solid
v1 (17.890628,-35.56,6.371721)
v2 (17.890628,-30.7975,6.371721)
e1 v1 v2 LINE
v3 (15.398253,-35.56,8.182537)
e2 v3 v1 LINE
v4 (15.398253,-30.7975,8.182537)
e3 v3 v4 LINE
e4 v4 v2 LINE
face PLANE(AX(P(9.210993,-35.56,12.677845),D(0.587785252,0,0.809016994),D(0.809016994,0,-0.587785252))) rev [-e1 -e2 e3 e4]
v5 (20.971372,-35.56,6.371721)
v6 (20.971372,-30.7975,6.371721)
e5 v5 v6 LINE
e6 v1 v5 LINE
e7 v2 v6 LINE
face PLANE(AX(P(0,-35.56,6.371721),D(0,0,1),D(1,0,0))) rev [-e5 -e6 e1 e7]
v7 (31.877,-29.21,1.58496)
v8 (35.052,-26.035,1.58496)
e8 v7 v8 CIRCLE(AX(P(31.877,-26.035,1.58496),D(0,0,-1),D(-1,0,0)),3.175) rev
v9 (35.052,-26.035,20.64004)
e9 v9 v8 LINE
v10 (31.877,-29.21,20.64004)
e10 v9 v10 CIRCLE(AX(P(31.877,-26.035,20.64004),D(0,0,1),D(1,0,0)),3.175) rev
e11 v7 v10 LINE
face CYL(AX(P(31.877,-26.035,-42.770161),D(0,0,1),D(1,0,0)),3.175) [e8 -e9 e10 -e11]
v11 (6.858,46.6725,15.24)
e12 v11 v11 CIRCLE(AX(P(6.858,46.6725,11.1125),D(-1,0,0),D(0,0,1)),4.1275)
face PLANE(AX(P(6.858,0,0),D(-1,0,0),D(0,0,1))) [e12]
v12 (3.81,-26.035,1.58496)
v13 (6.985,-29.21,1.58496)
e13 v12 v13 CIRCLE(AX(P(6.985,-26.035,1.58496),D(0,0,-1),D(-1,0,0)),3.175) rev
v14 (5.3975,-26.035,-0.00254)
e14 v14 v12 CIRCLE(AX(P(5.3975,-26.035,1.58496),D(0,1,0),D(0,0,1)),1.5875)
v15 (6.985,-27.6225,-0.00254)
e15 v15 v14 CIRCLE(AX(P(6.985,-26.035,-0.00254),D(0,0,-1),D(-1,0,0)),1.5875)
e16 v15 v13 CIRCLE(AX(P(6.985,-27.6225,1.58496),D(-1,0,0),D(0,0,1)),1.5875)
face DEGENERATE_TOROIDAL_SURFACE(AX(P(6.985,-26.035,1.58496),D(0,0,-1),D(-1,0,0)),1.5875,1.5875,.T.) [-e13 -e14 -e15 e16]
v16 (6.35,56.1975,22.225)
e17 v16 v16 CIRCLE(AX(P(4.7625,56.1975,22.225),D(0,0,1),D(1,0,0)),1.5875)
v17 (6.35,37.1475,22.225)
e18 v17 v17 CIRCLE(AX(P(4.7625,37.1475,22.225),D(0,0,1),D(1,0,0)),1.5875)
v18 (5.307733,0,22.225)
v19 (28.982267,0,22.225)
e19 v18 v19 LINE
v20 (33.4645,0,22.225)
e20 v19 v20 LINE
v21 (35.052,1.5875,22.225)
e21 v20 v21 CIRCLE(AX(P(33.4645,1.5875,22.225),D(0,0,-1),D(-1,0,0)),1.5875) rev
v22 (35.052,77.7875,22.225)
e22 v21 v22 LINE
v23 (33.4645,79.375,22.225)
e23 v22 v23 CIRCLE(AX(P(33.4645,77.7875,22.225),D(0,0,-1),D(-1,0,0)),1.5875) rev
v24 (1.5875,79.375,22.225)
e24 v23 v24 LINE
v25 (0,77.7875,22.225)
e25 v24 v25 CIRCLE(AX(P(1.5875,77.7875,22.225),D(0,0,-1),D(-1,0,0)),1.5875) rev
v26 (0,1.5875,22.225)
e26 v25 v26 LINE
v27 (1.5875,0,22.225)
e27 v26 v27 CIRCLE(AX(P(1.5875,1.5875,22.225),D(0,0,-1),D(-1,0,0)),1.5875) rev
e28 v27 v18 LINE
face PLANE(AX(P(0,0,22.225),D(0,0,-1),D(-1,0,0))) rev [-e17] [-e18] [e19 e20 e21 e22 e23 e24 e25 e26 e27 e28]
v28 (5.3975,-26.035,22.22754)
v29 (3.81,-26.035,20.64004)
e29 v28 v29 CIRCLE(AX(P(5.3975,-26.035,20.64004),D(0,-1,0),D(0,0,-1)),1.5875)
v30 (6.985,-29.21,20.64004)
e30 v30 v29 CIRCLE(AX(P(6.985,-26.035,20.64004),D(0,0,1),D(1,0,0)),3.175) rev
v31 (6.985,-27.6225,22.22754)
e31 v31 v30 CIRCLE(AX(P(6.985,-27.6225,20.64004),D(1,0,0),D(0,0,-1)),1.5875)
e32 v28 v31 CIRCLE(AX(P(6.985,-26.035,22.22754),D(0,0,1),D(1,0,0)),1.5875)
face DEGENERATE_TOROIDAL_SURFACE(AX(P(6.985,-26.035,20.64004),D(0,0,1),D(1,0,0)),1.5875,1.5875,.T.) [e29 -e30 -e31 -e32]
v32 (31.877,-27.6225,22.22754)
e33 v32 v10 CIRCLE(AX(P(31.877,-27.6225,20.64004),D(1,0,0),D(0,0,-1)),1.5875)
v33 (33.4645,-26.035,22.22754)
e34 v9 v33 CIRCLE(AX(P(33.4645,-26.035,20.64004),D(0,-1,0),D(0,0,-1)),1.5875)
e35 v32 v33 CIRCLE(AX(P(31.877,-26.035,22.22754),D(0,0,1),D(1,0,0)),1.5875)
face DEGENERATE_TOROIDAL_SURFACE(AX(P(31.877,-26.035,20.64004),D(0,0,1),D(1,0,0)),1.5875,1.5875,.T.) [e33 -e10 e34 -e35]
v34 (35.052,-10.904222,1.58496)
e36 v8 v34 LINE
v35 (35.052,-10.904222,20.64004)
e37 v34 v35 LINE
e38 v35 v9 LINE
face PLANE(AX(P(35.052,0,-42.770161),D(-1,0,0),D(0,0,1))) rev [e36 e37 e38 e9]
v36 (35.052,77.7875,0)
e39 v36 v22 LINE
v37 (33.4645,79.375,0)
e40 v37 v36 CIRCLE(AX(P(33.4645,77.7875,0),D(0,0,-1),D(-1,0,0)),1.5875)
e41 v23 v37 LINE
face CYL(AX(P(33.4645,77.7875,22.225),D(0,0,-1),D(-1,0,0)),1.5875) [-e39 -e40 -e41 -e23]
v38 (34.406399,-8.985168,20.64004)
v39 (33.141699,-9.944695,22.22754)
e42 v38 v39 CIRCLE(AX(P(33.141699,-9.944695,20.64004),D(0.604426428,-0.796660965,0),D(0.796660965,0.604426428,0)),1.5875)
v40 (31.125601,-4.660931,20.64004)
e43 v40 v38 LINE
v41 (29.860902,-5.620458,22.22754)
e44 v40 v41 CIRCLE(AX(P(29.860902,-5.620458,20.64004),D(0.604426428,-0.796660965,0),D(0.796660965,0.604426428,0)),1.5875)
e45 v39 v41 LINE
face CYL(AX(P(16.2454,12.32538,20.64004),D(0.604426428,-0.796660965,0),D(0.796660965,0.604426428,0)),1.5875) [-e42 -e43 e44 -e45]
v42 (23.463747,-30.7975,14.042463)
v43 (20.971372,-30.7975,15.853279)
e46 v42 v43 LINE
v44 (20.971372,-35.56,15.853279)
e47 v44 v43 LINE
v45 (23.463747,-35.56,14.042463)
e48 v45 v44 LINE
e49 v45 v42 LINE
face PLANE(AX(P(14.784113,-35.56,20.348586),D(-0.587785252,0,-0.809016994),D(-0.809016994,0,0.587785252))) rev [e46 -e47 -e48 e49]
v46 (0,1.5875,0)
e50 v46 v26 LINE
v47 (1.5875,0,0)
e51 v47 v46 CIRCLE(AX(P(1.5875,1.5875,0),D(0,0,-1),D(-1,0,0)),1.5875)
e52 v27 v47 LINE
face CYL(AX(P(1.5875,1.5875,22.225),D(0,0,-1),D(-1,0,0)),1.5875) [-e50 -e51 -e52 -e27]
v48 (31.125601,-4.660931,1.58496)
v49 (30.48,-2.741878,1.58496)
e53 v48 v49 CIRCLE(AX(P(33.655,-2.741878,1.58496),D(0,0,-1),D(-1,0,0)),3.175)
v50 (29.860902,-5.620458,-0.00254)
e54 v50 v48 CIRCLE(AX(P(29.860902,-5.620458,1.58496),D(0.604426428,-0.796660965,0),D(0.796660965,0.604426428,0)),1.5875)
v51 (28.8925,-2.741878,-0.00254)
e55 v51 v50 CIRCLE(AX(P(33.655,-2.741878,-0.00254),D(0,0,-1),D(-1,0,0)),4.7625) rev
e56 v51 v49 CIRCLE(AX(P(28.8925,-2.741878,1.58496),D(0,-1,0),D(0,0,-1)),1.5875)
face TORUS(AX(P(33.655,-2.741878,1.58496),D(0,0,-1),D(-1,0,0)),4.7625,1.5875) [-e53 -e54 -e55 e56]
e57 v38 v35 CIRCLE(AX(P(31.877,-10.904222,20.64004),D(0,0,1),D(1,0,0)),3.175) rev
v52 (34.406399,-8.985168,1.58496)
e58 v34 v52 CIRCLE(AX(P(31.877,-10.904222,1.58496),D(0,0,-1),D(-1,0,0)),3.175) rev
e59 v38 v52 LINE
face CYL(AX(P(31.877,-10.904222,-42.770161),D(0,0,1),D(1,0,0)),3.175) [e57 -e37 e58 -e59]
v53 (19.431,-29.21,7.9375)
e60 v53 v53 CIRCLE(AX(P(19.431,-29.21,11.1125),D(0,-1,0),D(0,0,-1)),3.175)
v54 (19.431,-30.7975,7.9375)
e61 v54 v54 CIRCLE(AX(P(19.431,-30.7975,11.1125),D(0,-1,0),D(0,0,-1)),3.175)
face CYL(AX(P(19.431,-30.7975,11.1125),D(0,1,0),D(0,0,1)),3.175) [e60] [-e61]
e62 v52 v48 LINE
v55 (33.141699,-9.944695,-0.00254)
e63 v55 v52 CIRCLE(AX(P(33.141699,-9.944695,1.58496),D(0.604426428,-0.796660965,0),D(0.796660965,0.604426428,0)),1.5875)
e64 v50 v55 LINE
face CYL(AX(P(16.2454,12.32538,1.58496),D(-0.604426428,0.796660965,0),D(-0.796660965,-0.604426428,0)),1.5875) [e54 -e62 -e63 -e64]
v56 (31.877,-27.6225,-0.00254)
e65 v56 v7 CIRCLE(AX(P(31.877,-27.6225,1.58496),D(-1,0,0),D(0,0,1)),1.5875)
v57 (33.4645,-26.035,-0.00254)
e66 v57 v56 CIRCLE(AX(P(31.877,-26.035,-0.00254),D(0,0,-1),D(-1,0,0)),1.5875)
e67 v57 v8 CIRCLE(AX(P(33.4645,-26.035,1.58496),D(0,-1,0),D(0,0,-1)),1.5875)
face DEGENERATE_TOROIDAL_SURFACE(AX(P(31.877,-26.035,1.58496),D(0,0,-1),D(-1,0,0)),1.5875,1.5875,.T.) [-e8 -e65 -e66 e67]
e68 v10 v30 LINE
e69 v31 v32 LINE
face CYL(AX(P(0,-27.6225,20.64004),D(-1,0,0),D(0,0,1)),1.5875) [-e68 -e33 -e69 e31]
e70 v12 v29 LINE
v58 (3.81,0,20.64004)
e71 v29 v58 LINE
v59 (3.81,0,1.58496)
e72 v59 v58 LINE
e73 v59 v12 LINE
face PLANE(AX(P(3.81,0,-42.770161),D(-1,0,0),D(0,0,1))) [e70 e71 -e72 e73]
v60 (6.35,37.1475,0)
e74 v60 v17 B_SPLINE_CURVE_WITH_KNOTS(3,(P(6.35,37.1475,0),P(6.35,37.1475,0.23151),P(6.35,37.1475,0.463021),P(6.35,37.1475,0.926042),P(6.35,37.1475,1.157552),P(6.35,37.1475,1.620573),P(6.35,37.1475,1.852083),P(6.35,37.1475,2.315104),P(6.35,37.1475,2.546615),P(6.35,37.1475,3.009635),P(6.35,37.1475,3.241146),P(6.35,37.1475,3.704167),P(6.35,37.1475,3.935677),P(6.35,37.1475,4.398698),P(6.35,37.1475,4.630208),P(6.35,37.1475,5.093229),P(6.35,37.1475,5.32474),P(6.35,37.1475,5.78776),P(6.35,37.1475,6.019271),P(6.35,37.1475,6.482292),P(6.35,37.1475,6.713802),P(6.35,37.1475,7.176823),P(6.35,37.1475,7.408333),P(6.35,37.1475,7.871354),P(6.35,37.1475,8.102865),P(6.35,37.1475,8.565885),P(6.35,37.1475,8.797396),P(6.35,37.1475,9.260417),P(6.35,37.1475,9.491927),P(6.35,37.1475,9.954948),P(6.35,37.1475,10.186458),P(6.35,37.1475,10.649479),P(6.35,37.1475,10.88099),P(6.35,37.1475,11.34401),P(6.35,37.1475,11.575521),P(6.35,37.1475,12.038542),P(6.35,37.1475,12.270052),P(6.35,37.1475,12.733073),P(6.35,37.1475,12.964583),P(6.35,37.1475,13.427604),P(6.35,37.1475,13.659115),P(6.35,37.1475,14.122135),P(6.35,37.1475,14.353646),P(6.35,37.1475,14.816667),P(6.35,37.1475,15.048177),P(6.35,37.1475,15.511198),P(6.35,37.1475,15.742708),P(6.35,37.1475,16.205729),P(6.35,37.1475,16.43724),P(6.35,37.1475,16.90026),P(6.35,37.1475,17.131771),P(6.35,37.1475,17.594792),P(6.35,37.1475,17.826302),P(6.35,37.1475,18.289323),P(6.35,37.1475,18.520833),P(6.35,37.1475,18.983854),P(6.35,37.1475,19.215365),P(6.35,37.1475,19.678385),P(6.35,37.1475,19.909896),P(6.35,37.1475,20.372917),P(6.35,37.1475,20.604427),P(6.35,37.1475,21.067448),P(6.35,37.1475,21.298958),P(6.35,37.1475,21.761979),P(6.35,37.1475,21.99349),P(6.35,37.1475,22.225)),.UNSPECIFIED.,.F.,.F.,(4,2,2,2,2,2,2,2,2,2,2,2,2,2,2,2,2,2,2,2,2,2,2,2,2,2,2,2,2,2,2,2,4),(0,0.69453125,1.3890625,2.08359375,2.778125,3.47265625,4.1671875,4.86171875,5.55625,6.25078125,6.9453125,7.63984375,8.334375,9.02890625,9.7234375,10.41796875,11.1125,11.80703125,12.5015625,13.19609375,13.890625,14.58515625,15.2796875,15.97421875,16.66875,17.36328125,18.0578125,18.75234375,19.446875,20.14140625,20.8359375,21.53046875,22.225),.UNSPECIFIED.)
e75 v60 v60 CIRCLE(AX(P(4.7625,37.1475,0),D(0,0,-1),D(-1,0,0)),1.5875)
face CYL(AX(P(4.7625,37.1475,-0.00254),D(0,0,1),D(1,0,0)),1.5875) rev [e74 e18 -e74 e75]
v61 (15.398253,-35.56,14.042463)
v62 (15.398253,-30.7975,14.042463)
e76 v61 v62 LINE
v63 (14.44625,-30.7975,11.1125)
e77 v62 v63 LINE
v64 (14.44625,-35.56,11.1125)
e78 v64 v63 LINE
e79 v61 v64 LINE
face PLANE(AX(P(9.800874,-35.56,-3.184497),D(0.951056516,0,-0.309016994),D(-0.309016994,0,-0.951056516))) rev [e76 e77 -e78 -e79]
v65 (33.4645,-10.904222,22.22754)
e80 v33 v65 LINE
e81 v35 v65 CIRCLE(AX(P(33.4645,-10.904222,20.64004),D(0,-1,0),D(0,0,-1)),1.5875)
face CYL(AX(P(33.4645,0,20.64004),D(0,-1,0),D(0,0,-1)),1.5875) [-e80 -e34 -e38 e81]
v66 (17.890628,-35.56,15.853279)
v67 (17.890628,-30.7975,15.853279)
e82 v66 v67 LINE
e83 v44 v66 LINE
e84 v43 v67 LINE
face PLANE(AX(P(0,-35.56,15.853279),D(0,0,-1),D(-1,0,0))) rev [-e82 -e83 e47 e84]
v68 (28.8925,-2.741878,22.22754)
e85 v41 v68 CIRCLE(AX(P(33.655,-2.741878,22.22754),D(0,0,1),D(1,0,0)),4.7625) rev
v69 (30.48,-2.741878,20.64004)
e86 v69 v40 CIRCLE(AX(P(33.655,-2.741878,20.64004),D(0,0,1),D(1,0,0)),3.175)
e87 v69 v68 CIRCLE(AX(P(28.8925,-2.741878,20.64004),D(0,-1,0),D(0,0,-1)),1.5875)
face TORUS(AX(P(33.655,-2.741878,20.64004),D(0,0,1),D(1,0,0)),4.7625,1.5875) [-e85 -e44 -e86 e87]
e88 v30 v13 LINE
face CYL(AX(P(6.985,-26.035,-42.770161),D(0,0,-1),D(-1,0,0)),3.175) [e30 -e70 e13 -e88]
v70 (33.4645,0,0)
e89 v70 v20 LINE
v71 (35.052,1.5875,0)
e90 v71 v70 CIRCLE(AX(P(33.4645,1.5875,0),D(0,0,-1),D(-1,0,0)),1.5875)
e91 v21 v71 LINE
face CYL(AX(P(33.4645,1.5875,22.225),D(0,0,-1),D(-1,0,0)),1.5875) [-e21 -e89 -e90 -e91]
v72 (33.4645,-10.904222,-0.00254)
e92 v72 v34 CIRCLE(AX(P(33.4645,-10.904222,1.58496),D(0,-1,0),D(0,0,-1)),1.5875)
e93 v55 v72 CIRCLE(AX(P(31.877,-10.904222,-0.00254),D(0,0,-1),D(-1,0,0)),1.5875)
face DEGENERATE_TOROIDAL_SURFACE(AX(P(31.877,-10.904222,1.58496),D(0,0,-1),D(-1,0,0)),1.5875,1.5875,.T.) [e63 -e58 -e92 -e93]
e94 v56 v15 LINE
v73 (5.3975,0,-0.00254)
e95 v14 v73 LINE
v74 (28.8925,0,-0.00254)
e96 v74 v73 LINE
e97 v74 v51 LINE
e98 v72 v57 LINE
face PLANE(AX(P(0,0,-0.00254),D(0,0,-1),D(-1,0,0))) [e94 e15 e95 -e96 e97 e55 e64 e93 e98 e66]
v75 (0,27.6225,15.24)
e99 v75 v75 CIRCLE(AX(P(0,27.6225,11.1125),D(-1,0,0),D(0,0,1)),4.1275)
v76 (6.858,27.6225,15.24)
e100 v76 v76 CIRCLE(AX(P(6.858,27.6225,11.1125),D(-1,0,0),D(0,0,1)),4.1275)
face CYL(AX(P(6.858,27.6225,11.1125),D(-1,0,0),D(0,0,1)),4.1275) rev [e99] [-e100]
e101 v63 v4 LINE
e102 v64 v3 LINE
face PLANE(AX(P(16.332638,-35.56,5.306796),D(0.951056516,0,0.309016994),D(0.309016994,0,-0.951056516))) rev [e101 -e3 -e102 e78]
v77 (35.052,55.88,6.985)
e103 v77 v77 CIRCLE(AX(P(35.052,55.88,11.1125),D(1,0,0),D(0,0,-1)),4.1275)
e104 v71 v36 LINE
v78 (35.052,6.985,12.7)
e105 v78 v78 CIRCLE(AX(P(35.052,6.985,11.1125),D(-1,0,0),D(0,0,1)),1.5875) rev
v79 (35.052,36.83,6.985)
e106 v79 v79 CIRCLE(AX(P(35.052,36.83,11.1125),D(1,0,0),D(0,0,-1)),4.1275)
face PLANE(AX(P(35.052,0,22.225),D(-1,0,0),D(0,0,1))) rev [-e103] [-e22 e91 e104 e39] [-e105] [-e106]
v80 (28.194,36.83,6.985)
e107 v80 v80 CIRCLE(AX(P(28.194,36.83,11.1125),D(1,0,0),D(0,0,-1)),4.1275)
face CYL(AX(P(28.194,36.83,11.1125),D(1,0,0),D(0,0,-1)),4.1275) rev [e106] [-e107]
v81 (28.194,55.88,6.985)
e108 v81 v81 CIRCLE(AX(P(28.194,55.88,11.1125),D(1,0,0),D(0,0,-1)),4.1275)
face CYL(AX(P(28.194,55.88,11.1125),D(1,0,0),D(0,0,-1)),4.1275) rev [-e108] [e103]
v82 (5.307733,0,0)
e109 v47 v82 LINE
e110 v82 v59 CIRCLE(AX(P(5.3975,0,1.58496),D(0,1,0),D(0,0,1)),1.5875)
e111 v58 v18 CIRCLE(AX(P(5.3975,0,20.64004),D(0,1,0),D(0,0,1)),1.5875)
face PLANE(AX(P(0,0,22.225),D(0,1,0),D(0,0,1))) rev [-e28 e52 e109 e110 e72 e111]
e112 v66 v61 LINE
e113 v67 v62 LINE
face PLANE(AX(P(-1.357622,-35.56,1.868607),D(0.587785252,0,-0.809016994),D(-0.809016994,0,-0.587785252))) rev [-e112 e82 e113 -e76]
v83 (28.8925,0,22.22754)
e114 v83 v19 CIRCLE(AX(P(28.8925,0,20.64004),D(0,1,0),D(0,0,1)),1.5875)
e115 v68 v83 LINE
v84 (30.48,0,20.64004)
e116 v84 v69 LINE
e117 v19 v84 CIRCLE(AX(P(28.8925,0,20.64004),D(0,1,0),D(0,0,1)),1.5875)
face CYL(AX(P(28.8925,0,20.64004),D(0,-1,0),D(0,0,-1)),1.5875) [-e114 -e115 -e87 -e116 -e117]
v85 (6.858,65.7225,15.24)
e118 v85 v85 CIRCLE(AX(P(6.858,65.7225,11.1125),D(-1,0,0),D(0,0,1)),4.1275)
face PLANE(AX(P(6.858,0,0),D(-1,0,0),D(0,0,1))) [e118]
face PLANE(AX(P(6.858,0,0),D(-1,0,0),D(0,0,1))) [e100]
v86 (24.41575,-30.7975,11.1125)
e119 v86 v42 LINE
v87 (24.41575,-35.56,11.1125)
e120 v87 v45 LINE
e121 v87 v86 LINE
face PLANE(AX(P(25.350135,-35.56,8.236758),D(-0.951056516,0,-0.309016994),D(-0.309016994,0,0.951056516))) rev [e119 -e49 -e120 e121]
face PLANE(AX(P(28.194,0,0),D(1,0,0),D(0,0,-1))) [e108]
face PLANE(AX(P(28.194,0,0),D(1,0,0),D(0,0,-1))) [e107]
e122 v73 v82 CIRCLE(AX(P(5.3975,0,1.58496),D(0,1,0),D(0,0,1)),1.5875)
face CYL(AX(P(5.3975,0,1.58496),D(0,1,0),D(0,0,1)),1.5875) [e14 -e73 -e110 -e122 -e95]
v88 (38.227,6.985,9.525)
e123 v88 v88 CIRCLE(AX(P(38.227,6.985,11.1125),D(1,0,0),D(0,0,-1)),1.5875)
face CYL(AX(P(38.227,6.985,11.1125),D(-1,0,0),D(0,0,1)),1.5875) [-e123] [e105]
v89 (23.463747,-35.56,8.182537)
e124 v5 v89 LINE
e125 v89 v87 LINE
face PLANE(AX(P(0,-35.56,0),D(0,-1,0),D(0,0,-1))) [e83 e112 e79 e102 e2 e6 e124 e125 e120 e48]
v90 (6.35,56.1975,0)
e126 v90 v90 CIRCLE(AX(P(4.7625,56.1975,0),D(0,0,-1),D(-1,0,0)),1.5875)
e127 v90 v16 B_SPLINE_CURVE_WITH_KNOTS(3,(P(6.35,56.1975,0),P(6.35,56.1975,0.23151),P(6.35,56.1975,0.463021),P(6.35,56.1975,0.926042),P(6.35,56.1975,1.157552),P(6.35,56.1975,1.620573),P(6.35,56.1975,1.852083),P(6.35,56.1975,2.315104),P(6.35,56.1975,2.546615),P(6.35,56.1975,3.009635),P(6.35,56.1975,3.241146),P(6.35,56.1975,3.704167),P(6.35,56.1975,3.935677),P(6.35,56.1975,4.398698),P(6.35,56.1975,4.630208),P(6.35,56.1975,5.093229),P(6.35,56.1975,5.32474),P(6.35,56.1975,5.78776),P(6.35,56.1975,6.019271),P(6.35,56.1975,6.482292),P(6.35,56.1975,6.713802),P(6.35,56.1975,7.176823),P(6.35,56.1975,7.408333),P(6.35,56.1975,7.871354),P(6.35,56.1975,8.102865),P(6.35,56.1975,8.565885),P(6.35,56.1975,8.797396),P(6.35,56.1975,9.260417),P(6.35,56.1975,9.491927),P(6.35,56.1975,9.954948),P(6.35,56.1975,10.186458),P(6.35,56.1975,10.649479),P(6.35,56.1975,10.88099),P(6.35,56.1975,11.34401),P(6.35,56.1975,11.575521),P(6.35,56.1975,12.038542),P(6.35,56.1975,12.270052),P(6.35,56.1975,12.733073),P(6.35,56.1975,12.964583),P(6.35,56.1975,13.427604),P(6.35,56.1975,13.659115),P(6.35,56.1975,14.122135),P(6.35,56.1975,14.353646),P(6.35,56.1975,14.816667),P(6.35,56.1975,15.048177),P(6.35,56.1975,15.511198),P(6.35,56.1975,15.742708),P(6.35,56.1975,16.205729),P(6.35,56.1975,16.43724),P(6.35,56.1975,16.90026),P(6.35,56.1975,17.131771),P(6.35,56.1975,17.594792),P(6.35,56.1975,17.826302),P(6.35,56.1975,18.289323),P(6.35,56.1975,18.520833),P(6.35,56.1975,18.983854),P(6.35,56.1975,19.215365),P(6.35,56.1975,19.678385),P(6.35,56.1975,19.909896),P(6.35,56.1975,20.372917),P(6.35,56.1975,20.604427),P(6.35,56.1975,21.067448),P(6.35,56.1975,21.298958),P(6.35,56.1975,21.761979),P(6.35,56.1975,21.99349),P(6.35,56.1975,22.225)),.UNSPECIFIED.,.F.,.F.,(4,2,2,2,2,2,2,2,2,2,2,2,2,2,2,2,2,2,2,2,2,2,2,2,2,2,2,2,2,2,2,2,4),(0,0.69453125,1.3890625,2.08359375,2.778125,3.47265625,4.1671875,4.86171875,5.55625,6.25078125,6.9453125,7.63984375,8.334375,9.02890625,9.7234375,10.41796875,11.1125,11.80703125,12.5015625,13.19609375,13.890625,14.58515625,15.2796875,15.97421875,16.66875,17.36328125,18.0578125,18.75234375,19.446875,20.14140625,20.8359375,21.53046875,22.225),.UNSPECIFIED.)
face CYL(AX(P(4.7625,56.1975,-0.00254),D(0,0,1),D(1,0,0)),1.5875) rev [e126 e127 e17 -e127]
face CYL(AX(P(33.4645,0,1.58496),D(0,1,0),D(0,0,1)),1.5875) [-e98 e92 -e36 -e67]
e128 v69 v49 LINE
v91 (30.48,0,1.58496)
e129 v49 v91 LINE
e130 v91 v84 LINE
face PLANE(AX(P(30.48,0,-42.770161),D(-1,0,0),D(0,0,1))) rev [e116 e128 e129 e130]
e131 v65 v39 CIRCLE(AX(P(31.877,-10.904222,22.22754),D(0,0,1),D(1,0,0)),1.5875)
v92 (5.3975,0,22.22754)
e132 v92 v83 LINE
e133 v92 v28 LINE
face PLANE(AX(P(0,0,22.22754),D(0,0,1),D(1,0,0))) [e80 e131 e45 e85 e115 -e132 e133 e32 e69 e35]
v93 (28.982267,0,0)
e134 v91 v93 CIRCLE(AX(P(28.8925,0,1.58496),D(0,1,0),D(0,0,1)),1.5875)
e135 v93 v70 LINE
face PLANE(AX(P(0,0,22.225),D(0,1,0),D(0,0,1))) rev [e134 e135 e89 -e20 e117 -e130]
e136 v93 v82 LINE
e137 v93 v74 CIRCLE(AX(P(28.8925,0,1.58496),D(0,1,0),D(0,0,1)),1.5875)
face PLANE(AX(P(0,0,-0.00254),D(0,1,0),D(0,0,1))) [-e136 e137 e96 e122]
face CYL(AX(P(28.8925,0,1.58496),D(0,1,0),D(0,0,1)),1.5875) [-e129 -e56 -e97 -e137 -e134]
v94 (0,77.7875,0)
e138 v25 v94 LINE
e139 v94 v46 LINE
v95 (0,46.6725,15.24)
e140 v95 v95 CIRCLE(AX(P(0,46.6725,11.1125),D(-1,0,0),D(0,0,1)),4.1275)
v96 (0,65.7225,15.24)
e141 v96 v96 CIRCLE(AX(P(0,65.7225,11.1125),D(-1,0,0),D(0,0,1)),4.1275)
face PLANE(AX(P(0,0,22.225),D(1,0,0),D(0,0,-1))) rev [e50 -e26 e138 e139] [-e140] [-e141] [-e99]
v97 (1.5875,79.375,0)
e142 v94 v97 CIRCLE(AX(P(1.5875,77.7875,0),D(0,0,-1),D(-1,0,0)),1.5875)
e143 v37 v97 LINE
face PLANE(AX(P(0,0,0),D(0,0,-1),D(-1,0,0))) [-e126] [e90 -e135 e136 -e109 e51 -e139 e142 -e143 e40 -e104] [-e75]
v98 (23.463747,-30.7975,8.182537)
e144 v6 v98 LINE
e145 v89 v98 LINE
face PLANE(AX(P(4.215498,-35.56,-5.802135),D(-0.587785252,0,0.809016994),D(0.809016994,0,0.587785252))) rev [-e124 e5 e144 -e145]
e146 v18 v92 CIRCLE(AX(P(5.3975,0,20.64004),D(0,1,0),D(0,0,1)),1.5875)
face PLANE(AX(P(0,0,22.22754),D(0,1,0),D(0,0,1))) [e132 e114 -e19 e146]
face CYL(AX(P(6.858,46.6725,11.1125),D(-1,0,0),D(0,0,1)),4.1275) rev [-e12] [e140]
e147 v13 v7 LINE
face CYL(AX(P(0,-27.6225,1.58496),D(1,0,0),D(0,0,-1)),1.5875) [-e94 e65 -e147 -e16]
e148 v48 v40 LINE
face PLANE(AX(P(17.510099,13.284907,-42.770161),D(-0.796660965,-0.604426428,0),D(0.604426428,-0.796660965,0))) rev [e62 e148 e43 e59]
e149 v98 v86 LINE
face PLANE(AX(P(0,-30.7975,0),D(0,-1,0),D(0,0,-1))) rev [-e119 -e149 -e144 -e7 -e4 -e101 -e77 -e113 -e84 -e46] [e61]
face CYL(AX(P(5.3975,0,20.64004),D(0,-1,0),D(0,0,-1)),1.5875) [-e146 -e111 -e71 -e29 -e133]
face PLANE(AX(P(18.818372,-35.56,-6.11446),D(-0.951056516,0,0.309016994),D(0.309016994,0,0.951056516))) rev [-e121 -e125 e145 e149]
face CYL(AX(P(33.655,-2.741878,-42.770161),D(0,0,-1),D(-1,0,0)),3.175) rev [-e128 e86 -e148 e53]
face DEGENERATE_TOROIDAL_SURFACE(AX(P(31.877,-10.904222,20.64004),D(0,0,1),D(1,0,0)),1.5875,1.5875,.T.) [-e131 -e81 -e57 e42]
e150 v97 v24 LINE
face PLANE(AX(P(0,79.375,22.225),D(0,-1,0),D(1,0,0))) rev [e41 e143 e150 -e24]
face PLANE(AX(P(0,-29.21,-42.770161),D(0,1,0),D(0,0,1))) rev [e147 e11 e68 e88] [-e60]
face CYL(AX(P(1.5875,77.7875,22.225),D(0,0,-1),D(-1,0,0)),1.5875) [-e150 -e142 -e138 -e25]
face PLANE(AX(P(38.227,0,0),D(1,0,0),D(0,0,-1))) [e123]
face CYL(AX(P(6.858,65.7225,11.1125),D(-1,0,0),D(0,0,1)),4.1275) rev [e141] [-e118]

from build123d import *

# Parameters (mm, degrees)
SKETCH2_W           = 35.052
SKETCH2_H           = 79.375
BOSS_EXTRUDE1_DEPTH = 22.225
SKETCH3_R           = 1.5875
BOSS_EXTRUDE2_DEPTH = 3.175
BOSS_EXTRUDE4_DEPTH = 22.225
FILLET2_R           = 3.175
BOSS_EXTRUDE5_DEPTH = 0.00254
BOSS_EXTRUDE6_START = 0.00254
BOSS_EXTRUDE6_DEPTH = 0.00254
BOSS_EXTRUDE7_DEPTH = 6.35
SKETCH8_R           = 7.441189758
SKETCH8_R_2         = 3.175
CUT_EXTRUDE2_DEPTH  = 1.5875
FILLET3_R           = 1.5875
FILLET5_R           = 1.5875
SKETCH9_R           = 4.1275
CUT_EXTRUDE3_DEPTH  = 6.858
SKETCH10_R          = 4.1275
CUT_EXTRUDE4_DEPTH  = 6.858
SKETCH11_R          = 1.5875
CUT_EXTRUDE5_DEPTH  = 91.861200127


with BuildPart() as part:
    # Sketch2 → Boss-Extrude1 (new body)
    with BuildSketch(Plane.XY):
        with Locations((17.526, 39.6875)):
            Rectangle(SKETCH2_W, SKETCH2_H)
    extrude(amount=BOSS_EXTRUDE1_DEPTH)

    # Sketch3 → Boss-Extrude2 (add)
    with BuildSketch(Plane(origin=(35.052, 0, 0), x_dir=(0, 0, -1), z_dir=(1, 0, 0))):
        with Locations(Location((-11.1125, 6.985, 0), (0, 0, 180))):
            Circle(SKETCH3_R)
    extrude(amount=BOSS_EXTRUDE2_DEPTH)

    # Sketch4 → Boss-Extrude4 (add)
    with BuildSketch(Plane.XY.offset(22.225)):
        Polygon((30.48, -3.81), (30.48, 0), (29.21, 0), (3.81, 0), (3.81, -29.21), (35.052, -29.21), (35.052, -9.836099718), align=None)
    extrude(amount=-BOSS_EXTRUDE4_DEPTH)

    # Fillet2
    fillet2_edges = [part.edges().sort_by_distance(p)[0] for p in [
        (30.48, -3.81, 11.1125),
        (35.052, -9.836099718, 11.1125),
        (35.052, -29.21, 11.1125),
        (3.81, -29.21, 11.1125),
    ]]
    fillet(fillet2_edges, radius=FILLET2_R)

    # Sketch5 → Boss-Extrude5 (add)
    with BuildSketch(Plane.XY.offset(22.225)):
        with BuildLine():
            Line((3.81, 0), (30.48, 0))
            Line((30.48, 0), (30.48, -2.741877551))
            ThreePointArc((30.48, -2.741877551), (30.64572555, -3.754247187), (31.125601437, -4.660931461))
            Line((31.125601437, -4.660931461), (34.406398563, -8.985168257))
            ThreePointArc((34.406398563, -8.985168257), (34.88627445, -9.891852531), (35.052, -10.904222168))
            Line((35.052, -10.904222168), (35.052, -26.035))
            ThreePointArc((35.052, -26.035), (34.12206403, -28.28006403), (31.877, -29.21))
            Line((31.877, -29.21), (6.985, -29.21))
            ThreePointArc((6.985, -29.21), (4.73993597, -28.28006403), (3.81, -26.035))
            Line((3.81, -26.035), (3.81, 0))
        make_face()
    extrude(amount=BOSS_EXTRUDE5_DEPTH)

    # Sketch6 → Boss-Extrude6 (add)
    with BuildSketch(Plane(origin=(0, 0, 0), x_dir=(-1, 0, 0), z_dir=(0, 0, -1)).offset(BOSS_EXTRUDE6_START)):
        with BuildLine():
            Line((-30.48, 0), (-3.81, 0))
            Line((-3.81, 0), (-3.81, -26.035))
            ThreePointArc((-3.81, -26.035), (-4.73993597, -28.28006403), (-6.985, -29.21))
            Line((-6.985, -29.21), (-31.877, -29.21))
            ThreePointArc((-31.877, -29.21), (-34.12206403, -28.28006403), (-35.052, -26.035))
            Line((-35.052, -26.035), (-35.052, -10.904222168))
            ThreePointArc((-35.052, -10.904222168), (-34.88627445, -9.891852531), (-34.406398563, -8.985168257))
            Line((-34.406398563, -8.985168257), (-31.125601437, -4.660931461))
            ThreePointArc((-31.125601437, -4.660931461), (-30.64572555, -3.754247187), (-30.48, -2.741877551))
            Line((-30.48, -2.741877551), (-30.48, 0))
        make_face()
    extrude(amount=-BOSS_EXTRUDE6_DEPTH)

    # Sketch7 → Boss-Extrude7 (add)
    with BuildSketch(Plane.XZ.offset(29.21)):
        Polygon((17.890627537, 15.85327897), (15.398252537, 14.042462536), (14.44625, 11.1125), (15.398252537, 8.182537464), (17.890627537, 6.37172103), (20.971372463, 6.37172103), (23.463747463, 8.182537464), (24.41575, 11.1125), (23.463747463, 14.042462536), (20.971372463, 15.85327897), align=None)
    extrude(amount=BOSS_EXTRUDE7_DEPTH)

    # Sketch8 → Cut-Extrude2 (cut)
    # profile 1 of 2: a face of its own
    with BuildSketch(Plane.XZ.offset(29.21)):
        with Locations((19.431, 11.1125)):
            Circle(SKETCH8_R)
        Polygon((14.44625, 11.1125), (15.398252537, 14.042462536), (17.890627537, 15.85327897), (20.971372463, 15.85327897), (23.463747463, 14.042462536), (24.41575, 11.1125), (23.463747463, 8.182537464), (20.971372463, 6.37172103), (17.890627537, 6.37172103), (15.398252537, 8.182537464), align=None, mode=Mode.SUBTRACT)
    # profile 2 of 2: a face of its own
    with BuildSketch(Plane.XZ.offset(29.21)):
        Polygon((15.398252537, 14.042462536), (17.890627537, 15.85327897), (20.971372463, 15.85327897), (23.463747463, 14.042462536), (24.41575, 11.1125), (23.463747463, 8.182537464), (20.971372463, 6.37172103), (17.890627537, 6.37172103), (15.398252537, 8.182537464), (14.44625, 11.1125), align=None)
        with Locations(Location((19.431, 11.1125, 0), (0, 0, 270))):
            Circle(SKETCH8_R_2, mode=Mode.SUBTRACT)
    extrude(amount=CUT_EXTRUDE2_DEPTH, mode=Mode.SUBTRACT)

    # Fillet3
    fillet3_edges = [part.edges().sort_by_distance(p)[0] for p in [
        (0, 79.375, 11.1125),
        (35.052, 79.375, 11.1125),
        (35.052, 0, 11.1125),
        (0, 0, 11.1125),
    ]]
    fillet(fillet3_edges, radius=FILLET3_R)

    # Fillet5
    # the kernel refuses this fillet: 1.5875 mm, written as the material it takes off along each edge
    with BuildSketch(Plane(origin=(30.48, -2.741877551, -0.00254), x_dir=(0, 0, 1), z_dir=(0, 1, 0)), Plane(origin=(30.48, 0, 22.22754), x_dir=(0, 0, -1), z_dir=(0, -1, 0))) as fillet5_piece_1:
        with BuildLine():
            CenterArc((FILLET5_R, -FILLET5_R), FILLET5_R, 90, 90)
            Line((0, -FILLET5_R), (0, 0))
            Line((0, 0), (FILLET5_R, 0))
        make_face()
    extrude(amount=2.741877551, mode=Mode.SUBTRACT)
    with BuildSketch(Plane(origin=(33.655, -2.741877551, -0.00254), x_dir=(-0.7966609646289196, -0.6044264284729114, 0), z_dir=(0.6044264284729114, -0.7966609646289196, 0))) as fillet5_piece_2:
        with BuildLine():
            CenterArc((3.175 + FILLET5_R, -FILLET5_R), FILLET5_R, 90, 90)
            Line((3.175, -FILLET5_R), (3.175, 0))
            Line((3.175, 0), (3.175 + FILLET5_R, 0))
        make_face()
    revolve(axis=Axis((33.655, -2.741877551, -0.00254), (0, 0, -1)), revolution_arc=37.18757939, mode=Mode.SUBTRACT)
    with BuildSketch(Plane(origin=(34.406398563, -8.985168257, -0.00254), x_dir=(-0.796660964628914, -0.6044264284729185, 0), z_dir=(-0.6044264284729186, 0.7966609646289141, 0)), Plane(origin=(31.125601437, -4.660931461, 22.22754), x_dir=(-0.7966609646289139, -0.6044264284729186, 0), z_dir=(0.6044264284729186, -0.796660964628914, 0))) as fillet5_piece_3:
        with BuildLine():
            CenterArc((FILLET5_R, FILLET5_R), FILLET5_R, 180, 90)
            Line((0, FILLET5_R), (0, 0))
            Line((0, 0), (FILLET5_R, 0))
        make_face()
    extrude(amount=5.427951146, mode=Mode.SUBTRACT)
    with BuildSketch(Plane(origin=(31.877, -10.904222168, -0.00254), x_dir=(1, 0, 0), z_dir=(0, -1, 0))) as fillet5_piece_4:
        with BuildLine():
            CenterArc((3.175 - FILLET5_R, FILLET5_R), FILLET5_R, 270, 90)
            Line((3.175, FILLET5_R), (3.175, 0))
            Line((3.175, 0), (3.175 - FILLET5_R, 0))
        make_face()
    revolve(axis=Axis((31.877, -10.904222168, -0.00254), (0, 0, 1)), revolution_arc=37.18757939, mode=Mode.SUBTRACT)
    with BuildSketch(Plane(origin=(35.052, -26.035, -0.00254), x_dir=(-1, 0, 0), z_dir=(0, 1, 0)), Plane(origin=(35.052, -10.904222168, 22.22754), x_dir=(-1, 0, 0), z_dir=(0, -1, 0))) as fillet5_piece_5:
        with BuildLine():
            CenterArc((FILLET5_R, FILLET5_R), FILLET5_R, 180, 90)
            Line((0, FILLET5_R), (0, 0))
            Line((0, 0), (FILLET5_R, 0))
        make_face()
    extrude(amount=15.130777832, mode=Mode.SUBTRACT)
    with BuildSketch(Plane(origin=(31.877, -26.035, -0.00254), x_dir=(0, -1, 0), z_dir=(-1, 0, 0))) as fillet5_piece_6:
        with BuildLine():
            CenterArc((3.175 - FILLET5_R, FILLET5_R), FILLET5_R, 270, 90)
            Line((3.175, FILLET5_R), (3.175, 0))
            Line((3.175, 0), (3.175 - FILLET5_R, 0))
        make_face()
    revolve(axis=Axis((31.877, -26.035, -0.00254), (0, 0, 1)), revolution_arc=90, mode=Mode.SUBTRACT)
    with BuildSketch(Plane(origin=(6.985, -29.21, -0.00254), x_dir=(0, 1, 0), z_dir=(1, 0, 0)), Plane(origin=(31.877, -29.21, 22.22754), x_dir=(0, 1, 0), z_dir=(-1, 0, 0))) as fillet5_piece_7:
        with BuildLine():
            CenterArc((FILLET5_R, FILLET5_R), FILLET5_R, 180, 90)
            Line((0, FILLET5_R), (0, 0))
            Line((0, 0), (FILLET5_R, 0))
        make_face()
    extrude(amount=24.892, mode=Mode.SUBTRACT)
    with BuildSketch(Plane(origin=(6.985, -26.035, -0.00254), x_dir=(-1, 0, 0), z_dir=(0, 1, 0))) as fillet5_piece_8:
        with BuildLine():
            CenterArc((3.175 - FILLET5_R, FILLET5_R), FILLET5_R, 270, 90)
            Line((3.175, FILLET5_R), (3.175, 0))
            Line((3.175, 0), (3.175 - FILLET5_R, 0))
        make_face()
    revolve(axis=Axis((6.985, -26.035, -0.00254), (0, 0, 1)), revolution_arc=90, mode=Mode.SUBTRACT)
    with BuildSketch(Plane(origin=(3.81, 0, -0.00254), x_dir=(0, 0, 1), z_dir=(0, -1, 0)), Plane(origin=(3.81, -26.035, 22.22754), x_dir=(0, 0, -1), z_dir=(0, 1, 0))) as fillet5_piece_9:
        with BuildLine():
            CenterArc((FILLET5_R, -FILLET5_R), FILLET5_R, 90, 90)
            Line((0, -FILLET5_R), (0, 0))
            Line((0, 0), (FILLET5_R, 0))
        make_face()
    extrude(amount=26.035, mode=Mode.SUBTRACT)
    with BuildSketch(Plane(origin=(6.985, -26.035, 22.22754), x_dir=(0, -1, 0), z_dir=(1, 0, 0))) as fillet5_piece_10:
        with BuildLine():
            CenterArc((3.175 - FILLET5_R, FILLET5_R), FILLET5_R, 270, 90)
            Line((3.175, FILLET5_R), (3.175, 0))
            Line((3.175, 0), (3.175 - FILLET5_R, 0))
        make_face()
    revolve(axis=Axis((6.985, -26.035, 22.22754), (0, 0, -1)), revolution_arc=90, mode=Mode.SUBTRACT)
    with BuildSketch(Plane(origin=(31.877, -26.035, 22.22754), x_dir=(1, 0, 0), z_dir=(0, 1, 0))) as fillet5_piece_11:
        with BuildLine():
            CenterArc((3.175 - FILLET5_R, FILLET5_R), FILLET5_R, 270, 90)
            Line((3.175, FILLET5_R), (3.175, 0))
            Line((3.175, 0), (3.175 - FILLET5_R, 0))
        make_face()
    revolve(axis=Axis((31.877, -26.035, 22.22754), (0, 0, -1)), revolution_arc=90, mode=Mode.SUBTRACT)
    with BuildSketch(Plane(origin=(31.877, -10.904222168, 22.22754), x_dir=(0.7966609646289129, 0.6044264284729202, 0), z_dir=(-0.6044264284729202, 0.7966609646289129, 0))) as fillet5_piece_12:
        with BuildLine():
            CenterArc((3.175 - FILLET5_R, FILLET5_R), FILLET5_R, 270, 90)
            Line((3.175, FILLET5_R), (3.175, 0))
            Line((3.175, 0), (3.175 - FILLET5_R, 0))
        make_face()
    revolve(axis=Axis((31.877, -10.904222168, 22.22754), (0, 0, -1)), revolution_arc=37.18757939, mode=Mode.SUBTRACT)
    with BuildSketch(Plane(origin=(33.655, -2.741877551, 22.22754), x_dir=(-1, 0, 0), z_dir=(0, 1, 0))) as fillet5_piece_13:
        with BuildLine():
            CenterArc((3.175 + FILLET5_R, -FILLET5_R), FILLET5_R, 90, 90)
            Line((3.175, -FILLET5_R), (3.175, 0))
            Line((3.175, 0), (3.175 + FILLET5_R, 0))
        make_face()
    revolve(axis=Axis((33.655, -2.741877551, 22.22754), (0, 0, 1)), revolution_arc=37.18757939, mode=Mode.SUBTRACT)

    # Sketch9 → Cut-Extrude3 (cut)
    with BuildSketch(Plane(origin=(35.052, 0, 0), x_dir=(0, 0, -1), z_dir=(1, 0, 0))):
        with Locations((-11.1125, 55.88)):
            Circle(SKETCH9_R)
        with Locations((-11.1125, 36.83)):
            Circle(SKETCH9_R)
    extrude(amount=-CUT_EXTRUDE3_DEPTH, mode=Mode.SUBTRACT)

    # Sketch10 → Cut-Extrude4 (cut)
    with BuildSketch(Plane.ZY):
        with Locations((11.1125, 65.7225)):
            Circle(SKETCH10_R)
        with Locations((11.1125, 46.6725)):
            Circle(SKETCH10_R)
        with Locations((11.1125, 27.6225)):
            Circle(SKETCH10_R)
    extrude(amount=-CUT_EXTRUDE4_DEPTH, mode=Mode.SUBTRACT)

    # Sketch11 → Cut-Extrude5 (cut, through all)
    with BuildSketch(Plane.XY.offset(22.225)):
        with Locations((4.7625, 56.1975)):
            Circle(SKETCH11_R)
        with Locations((4.7625, 37.1475)):
            Circle(SKETCH11_R)
    extrude(amount=-CUT_EXTRUDE5_DEPTH, mode=Mode.SUBTRACT)


solid = part.part
